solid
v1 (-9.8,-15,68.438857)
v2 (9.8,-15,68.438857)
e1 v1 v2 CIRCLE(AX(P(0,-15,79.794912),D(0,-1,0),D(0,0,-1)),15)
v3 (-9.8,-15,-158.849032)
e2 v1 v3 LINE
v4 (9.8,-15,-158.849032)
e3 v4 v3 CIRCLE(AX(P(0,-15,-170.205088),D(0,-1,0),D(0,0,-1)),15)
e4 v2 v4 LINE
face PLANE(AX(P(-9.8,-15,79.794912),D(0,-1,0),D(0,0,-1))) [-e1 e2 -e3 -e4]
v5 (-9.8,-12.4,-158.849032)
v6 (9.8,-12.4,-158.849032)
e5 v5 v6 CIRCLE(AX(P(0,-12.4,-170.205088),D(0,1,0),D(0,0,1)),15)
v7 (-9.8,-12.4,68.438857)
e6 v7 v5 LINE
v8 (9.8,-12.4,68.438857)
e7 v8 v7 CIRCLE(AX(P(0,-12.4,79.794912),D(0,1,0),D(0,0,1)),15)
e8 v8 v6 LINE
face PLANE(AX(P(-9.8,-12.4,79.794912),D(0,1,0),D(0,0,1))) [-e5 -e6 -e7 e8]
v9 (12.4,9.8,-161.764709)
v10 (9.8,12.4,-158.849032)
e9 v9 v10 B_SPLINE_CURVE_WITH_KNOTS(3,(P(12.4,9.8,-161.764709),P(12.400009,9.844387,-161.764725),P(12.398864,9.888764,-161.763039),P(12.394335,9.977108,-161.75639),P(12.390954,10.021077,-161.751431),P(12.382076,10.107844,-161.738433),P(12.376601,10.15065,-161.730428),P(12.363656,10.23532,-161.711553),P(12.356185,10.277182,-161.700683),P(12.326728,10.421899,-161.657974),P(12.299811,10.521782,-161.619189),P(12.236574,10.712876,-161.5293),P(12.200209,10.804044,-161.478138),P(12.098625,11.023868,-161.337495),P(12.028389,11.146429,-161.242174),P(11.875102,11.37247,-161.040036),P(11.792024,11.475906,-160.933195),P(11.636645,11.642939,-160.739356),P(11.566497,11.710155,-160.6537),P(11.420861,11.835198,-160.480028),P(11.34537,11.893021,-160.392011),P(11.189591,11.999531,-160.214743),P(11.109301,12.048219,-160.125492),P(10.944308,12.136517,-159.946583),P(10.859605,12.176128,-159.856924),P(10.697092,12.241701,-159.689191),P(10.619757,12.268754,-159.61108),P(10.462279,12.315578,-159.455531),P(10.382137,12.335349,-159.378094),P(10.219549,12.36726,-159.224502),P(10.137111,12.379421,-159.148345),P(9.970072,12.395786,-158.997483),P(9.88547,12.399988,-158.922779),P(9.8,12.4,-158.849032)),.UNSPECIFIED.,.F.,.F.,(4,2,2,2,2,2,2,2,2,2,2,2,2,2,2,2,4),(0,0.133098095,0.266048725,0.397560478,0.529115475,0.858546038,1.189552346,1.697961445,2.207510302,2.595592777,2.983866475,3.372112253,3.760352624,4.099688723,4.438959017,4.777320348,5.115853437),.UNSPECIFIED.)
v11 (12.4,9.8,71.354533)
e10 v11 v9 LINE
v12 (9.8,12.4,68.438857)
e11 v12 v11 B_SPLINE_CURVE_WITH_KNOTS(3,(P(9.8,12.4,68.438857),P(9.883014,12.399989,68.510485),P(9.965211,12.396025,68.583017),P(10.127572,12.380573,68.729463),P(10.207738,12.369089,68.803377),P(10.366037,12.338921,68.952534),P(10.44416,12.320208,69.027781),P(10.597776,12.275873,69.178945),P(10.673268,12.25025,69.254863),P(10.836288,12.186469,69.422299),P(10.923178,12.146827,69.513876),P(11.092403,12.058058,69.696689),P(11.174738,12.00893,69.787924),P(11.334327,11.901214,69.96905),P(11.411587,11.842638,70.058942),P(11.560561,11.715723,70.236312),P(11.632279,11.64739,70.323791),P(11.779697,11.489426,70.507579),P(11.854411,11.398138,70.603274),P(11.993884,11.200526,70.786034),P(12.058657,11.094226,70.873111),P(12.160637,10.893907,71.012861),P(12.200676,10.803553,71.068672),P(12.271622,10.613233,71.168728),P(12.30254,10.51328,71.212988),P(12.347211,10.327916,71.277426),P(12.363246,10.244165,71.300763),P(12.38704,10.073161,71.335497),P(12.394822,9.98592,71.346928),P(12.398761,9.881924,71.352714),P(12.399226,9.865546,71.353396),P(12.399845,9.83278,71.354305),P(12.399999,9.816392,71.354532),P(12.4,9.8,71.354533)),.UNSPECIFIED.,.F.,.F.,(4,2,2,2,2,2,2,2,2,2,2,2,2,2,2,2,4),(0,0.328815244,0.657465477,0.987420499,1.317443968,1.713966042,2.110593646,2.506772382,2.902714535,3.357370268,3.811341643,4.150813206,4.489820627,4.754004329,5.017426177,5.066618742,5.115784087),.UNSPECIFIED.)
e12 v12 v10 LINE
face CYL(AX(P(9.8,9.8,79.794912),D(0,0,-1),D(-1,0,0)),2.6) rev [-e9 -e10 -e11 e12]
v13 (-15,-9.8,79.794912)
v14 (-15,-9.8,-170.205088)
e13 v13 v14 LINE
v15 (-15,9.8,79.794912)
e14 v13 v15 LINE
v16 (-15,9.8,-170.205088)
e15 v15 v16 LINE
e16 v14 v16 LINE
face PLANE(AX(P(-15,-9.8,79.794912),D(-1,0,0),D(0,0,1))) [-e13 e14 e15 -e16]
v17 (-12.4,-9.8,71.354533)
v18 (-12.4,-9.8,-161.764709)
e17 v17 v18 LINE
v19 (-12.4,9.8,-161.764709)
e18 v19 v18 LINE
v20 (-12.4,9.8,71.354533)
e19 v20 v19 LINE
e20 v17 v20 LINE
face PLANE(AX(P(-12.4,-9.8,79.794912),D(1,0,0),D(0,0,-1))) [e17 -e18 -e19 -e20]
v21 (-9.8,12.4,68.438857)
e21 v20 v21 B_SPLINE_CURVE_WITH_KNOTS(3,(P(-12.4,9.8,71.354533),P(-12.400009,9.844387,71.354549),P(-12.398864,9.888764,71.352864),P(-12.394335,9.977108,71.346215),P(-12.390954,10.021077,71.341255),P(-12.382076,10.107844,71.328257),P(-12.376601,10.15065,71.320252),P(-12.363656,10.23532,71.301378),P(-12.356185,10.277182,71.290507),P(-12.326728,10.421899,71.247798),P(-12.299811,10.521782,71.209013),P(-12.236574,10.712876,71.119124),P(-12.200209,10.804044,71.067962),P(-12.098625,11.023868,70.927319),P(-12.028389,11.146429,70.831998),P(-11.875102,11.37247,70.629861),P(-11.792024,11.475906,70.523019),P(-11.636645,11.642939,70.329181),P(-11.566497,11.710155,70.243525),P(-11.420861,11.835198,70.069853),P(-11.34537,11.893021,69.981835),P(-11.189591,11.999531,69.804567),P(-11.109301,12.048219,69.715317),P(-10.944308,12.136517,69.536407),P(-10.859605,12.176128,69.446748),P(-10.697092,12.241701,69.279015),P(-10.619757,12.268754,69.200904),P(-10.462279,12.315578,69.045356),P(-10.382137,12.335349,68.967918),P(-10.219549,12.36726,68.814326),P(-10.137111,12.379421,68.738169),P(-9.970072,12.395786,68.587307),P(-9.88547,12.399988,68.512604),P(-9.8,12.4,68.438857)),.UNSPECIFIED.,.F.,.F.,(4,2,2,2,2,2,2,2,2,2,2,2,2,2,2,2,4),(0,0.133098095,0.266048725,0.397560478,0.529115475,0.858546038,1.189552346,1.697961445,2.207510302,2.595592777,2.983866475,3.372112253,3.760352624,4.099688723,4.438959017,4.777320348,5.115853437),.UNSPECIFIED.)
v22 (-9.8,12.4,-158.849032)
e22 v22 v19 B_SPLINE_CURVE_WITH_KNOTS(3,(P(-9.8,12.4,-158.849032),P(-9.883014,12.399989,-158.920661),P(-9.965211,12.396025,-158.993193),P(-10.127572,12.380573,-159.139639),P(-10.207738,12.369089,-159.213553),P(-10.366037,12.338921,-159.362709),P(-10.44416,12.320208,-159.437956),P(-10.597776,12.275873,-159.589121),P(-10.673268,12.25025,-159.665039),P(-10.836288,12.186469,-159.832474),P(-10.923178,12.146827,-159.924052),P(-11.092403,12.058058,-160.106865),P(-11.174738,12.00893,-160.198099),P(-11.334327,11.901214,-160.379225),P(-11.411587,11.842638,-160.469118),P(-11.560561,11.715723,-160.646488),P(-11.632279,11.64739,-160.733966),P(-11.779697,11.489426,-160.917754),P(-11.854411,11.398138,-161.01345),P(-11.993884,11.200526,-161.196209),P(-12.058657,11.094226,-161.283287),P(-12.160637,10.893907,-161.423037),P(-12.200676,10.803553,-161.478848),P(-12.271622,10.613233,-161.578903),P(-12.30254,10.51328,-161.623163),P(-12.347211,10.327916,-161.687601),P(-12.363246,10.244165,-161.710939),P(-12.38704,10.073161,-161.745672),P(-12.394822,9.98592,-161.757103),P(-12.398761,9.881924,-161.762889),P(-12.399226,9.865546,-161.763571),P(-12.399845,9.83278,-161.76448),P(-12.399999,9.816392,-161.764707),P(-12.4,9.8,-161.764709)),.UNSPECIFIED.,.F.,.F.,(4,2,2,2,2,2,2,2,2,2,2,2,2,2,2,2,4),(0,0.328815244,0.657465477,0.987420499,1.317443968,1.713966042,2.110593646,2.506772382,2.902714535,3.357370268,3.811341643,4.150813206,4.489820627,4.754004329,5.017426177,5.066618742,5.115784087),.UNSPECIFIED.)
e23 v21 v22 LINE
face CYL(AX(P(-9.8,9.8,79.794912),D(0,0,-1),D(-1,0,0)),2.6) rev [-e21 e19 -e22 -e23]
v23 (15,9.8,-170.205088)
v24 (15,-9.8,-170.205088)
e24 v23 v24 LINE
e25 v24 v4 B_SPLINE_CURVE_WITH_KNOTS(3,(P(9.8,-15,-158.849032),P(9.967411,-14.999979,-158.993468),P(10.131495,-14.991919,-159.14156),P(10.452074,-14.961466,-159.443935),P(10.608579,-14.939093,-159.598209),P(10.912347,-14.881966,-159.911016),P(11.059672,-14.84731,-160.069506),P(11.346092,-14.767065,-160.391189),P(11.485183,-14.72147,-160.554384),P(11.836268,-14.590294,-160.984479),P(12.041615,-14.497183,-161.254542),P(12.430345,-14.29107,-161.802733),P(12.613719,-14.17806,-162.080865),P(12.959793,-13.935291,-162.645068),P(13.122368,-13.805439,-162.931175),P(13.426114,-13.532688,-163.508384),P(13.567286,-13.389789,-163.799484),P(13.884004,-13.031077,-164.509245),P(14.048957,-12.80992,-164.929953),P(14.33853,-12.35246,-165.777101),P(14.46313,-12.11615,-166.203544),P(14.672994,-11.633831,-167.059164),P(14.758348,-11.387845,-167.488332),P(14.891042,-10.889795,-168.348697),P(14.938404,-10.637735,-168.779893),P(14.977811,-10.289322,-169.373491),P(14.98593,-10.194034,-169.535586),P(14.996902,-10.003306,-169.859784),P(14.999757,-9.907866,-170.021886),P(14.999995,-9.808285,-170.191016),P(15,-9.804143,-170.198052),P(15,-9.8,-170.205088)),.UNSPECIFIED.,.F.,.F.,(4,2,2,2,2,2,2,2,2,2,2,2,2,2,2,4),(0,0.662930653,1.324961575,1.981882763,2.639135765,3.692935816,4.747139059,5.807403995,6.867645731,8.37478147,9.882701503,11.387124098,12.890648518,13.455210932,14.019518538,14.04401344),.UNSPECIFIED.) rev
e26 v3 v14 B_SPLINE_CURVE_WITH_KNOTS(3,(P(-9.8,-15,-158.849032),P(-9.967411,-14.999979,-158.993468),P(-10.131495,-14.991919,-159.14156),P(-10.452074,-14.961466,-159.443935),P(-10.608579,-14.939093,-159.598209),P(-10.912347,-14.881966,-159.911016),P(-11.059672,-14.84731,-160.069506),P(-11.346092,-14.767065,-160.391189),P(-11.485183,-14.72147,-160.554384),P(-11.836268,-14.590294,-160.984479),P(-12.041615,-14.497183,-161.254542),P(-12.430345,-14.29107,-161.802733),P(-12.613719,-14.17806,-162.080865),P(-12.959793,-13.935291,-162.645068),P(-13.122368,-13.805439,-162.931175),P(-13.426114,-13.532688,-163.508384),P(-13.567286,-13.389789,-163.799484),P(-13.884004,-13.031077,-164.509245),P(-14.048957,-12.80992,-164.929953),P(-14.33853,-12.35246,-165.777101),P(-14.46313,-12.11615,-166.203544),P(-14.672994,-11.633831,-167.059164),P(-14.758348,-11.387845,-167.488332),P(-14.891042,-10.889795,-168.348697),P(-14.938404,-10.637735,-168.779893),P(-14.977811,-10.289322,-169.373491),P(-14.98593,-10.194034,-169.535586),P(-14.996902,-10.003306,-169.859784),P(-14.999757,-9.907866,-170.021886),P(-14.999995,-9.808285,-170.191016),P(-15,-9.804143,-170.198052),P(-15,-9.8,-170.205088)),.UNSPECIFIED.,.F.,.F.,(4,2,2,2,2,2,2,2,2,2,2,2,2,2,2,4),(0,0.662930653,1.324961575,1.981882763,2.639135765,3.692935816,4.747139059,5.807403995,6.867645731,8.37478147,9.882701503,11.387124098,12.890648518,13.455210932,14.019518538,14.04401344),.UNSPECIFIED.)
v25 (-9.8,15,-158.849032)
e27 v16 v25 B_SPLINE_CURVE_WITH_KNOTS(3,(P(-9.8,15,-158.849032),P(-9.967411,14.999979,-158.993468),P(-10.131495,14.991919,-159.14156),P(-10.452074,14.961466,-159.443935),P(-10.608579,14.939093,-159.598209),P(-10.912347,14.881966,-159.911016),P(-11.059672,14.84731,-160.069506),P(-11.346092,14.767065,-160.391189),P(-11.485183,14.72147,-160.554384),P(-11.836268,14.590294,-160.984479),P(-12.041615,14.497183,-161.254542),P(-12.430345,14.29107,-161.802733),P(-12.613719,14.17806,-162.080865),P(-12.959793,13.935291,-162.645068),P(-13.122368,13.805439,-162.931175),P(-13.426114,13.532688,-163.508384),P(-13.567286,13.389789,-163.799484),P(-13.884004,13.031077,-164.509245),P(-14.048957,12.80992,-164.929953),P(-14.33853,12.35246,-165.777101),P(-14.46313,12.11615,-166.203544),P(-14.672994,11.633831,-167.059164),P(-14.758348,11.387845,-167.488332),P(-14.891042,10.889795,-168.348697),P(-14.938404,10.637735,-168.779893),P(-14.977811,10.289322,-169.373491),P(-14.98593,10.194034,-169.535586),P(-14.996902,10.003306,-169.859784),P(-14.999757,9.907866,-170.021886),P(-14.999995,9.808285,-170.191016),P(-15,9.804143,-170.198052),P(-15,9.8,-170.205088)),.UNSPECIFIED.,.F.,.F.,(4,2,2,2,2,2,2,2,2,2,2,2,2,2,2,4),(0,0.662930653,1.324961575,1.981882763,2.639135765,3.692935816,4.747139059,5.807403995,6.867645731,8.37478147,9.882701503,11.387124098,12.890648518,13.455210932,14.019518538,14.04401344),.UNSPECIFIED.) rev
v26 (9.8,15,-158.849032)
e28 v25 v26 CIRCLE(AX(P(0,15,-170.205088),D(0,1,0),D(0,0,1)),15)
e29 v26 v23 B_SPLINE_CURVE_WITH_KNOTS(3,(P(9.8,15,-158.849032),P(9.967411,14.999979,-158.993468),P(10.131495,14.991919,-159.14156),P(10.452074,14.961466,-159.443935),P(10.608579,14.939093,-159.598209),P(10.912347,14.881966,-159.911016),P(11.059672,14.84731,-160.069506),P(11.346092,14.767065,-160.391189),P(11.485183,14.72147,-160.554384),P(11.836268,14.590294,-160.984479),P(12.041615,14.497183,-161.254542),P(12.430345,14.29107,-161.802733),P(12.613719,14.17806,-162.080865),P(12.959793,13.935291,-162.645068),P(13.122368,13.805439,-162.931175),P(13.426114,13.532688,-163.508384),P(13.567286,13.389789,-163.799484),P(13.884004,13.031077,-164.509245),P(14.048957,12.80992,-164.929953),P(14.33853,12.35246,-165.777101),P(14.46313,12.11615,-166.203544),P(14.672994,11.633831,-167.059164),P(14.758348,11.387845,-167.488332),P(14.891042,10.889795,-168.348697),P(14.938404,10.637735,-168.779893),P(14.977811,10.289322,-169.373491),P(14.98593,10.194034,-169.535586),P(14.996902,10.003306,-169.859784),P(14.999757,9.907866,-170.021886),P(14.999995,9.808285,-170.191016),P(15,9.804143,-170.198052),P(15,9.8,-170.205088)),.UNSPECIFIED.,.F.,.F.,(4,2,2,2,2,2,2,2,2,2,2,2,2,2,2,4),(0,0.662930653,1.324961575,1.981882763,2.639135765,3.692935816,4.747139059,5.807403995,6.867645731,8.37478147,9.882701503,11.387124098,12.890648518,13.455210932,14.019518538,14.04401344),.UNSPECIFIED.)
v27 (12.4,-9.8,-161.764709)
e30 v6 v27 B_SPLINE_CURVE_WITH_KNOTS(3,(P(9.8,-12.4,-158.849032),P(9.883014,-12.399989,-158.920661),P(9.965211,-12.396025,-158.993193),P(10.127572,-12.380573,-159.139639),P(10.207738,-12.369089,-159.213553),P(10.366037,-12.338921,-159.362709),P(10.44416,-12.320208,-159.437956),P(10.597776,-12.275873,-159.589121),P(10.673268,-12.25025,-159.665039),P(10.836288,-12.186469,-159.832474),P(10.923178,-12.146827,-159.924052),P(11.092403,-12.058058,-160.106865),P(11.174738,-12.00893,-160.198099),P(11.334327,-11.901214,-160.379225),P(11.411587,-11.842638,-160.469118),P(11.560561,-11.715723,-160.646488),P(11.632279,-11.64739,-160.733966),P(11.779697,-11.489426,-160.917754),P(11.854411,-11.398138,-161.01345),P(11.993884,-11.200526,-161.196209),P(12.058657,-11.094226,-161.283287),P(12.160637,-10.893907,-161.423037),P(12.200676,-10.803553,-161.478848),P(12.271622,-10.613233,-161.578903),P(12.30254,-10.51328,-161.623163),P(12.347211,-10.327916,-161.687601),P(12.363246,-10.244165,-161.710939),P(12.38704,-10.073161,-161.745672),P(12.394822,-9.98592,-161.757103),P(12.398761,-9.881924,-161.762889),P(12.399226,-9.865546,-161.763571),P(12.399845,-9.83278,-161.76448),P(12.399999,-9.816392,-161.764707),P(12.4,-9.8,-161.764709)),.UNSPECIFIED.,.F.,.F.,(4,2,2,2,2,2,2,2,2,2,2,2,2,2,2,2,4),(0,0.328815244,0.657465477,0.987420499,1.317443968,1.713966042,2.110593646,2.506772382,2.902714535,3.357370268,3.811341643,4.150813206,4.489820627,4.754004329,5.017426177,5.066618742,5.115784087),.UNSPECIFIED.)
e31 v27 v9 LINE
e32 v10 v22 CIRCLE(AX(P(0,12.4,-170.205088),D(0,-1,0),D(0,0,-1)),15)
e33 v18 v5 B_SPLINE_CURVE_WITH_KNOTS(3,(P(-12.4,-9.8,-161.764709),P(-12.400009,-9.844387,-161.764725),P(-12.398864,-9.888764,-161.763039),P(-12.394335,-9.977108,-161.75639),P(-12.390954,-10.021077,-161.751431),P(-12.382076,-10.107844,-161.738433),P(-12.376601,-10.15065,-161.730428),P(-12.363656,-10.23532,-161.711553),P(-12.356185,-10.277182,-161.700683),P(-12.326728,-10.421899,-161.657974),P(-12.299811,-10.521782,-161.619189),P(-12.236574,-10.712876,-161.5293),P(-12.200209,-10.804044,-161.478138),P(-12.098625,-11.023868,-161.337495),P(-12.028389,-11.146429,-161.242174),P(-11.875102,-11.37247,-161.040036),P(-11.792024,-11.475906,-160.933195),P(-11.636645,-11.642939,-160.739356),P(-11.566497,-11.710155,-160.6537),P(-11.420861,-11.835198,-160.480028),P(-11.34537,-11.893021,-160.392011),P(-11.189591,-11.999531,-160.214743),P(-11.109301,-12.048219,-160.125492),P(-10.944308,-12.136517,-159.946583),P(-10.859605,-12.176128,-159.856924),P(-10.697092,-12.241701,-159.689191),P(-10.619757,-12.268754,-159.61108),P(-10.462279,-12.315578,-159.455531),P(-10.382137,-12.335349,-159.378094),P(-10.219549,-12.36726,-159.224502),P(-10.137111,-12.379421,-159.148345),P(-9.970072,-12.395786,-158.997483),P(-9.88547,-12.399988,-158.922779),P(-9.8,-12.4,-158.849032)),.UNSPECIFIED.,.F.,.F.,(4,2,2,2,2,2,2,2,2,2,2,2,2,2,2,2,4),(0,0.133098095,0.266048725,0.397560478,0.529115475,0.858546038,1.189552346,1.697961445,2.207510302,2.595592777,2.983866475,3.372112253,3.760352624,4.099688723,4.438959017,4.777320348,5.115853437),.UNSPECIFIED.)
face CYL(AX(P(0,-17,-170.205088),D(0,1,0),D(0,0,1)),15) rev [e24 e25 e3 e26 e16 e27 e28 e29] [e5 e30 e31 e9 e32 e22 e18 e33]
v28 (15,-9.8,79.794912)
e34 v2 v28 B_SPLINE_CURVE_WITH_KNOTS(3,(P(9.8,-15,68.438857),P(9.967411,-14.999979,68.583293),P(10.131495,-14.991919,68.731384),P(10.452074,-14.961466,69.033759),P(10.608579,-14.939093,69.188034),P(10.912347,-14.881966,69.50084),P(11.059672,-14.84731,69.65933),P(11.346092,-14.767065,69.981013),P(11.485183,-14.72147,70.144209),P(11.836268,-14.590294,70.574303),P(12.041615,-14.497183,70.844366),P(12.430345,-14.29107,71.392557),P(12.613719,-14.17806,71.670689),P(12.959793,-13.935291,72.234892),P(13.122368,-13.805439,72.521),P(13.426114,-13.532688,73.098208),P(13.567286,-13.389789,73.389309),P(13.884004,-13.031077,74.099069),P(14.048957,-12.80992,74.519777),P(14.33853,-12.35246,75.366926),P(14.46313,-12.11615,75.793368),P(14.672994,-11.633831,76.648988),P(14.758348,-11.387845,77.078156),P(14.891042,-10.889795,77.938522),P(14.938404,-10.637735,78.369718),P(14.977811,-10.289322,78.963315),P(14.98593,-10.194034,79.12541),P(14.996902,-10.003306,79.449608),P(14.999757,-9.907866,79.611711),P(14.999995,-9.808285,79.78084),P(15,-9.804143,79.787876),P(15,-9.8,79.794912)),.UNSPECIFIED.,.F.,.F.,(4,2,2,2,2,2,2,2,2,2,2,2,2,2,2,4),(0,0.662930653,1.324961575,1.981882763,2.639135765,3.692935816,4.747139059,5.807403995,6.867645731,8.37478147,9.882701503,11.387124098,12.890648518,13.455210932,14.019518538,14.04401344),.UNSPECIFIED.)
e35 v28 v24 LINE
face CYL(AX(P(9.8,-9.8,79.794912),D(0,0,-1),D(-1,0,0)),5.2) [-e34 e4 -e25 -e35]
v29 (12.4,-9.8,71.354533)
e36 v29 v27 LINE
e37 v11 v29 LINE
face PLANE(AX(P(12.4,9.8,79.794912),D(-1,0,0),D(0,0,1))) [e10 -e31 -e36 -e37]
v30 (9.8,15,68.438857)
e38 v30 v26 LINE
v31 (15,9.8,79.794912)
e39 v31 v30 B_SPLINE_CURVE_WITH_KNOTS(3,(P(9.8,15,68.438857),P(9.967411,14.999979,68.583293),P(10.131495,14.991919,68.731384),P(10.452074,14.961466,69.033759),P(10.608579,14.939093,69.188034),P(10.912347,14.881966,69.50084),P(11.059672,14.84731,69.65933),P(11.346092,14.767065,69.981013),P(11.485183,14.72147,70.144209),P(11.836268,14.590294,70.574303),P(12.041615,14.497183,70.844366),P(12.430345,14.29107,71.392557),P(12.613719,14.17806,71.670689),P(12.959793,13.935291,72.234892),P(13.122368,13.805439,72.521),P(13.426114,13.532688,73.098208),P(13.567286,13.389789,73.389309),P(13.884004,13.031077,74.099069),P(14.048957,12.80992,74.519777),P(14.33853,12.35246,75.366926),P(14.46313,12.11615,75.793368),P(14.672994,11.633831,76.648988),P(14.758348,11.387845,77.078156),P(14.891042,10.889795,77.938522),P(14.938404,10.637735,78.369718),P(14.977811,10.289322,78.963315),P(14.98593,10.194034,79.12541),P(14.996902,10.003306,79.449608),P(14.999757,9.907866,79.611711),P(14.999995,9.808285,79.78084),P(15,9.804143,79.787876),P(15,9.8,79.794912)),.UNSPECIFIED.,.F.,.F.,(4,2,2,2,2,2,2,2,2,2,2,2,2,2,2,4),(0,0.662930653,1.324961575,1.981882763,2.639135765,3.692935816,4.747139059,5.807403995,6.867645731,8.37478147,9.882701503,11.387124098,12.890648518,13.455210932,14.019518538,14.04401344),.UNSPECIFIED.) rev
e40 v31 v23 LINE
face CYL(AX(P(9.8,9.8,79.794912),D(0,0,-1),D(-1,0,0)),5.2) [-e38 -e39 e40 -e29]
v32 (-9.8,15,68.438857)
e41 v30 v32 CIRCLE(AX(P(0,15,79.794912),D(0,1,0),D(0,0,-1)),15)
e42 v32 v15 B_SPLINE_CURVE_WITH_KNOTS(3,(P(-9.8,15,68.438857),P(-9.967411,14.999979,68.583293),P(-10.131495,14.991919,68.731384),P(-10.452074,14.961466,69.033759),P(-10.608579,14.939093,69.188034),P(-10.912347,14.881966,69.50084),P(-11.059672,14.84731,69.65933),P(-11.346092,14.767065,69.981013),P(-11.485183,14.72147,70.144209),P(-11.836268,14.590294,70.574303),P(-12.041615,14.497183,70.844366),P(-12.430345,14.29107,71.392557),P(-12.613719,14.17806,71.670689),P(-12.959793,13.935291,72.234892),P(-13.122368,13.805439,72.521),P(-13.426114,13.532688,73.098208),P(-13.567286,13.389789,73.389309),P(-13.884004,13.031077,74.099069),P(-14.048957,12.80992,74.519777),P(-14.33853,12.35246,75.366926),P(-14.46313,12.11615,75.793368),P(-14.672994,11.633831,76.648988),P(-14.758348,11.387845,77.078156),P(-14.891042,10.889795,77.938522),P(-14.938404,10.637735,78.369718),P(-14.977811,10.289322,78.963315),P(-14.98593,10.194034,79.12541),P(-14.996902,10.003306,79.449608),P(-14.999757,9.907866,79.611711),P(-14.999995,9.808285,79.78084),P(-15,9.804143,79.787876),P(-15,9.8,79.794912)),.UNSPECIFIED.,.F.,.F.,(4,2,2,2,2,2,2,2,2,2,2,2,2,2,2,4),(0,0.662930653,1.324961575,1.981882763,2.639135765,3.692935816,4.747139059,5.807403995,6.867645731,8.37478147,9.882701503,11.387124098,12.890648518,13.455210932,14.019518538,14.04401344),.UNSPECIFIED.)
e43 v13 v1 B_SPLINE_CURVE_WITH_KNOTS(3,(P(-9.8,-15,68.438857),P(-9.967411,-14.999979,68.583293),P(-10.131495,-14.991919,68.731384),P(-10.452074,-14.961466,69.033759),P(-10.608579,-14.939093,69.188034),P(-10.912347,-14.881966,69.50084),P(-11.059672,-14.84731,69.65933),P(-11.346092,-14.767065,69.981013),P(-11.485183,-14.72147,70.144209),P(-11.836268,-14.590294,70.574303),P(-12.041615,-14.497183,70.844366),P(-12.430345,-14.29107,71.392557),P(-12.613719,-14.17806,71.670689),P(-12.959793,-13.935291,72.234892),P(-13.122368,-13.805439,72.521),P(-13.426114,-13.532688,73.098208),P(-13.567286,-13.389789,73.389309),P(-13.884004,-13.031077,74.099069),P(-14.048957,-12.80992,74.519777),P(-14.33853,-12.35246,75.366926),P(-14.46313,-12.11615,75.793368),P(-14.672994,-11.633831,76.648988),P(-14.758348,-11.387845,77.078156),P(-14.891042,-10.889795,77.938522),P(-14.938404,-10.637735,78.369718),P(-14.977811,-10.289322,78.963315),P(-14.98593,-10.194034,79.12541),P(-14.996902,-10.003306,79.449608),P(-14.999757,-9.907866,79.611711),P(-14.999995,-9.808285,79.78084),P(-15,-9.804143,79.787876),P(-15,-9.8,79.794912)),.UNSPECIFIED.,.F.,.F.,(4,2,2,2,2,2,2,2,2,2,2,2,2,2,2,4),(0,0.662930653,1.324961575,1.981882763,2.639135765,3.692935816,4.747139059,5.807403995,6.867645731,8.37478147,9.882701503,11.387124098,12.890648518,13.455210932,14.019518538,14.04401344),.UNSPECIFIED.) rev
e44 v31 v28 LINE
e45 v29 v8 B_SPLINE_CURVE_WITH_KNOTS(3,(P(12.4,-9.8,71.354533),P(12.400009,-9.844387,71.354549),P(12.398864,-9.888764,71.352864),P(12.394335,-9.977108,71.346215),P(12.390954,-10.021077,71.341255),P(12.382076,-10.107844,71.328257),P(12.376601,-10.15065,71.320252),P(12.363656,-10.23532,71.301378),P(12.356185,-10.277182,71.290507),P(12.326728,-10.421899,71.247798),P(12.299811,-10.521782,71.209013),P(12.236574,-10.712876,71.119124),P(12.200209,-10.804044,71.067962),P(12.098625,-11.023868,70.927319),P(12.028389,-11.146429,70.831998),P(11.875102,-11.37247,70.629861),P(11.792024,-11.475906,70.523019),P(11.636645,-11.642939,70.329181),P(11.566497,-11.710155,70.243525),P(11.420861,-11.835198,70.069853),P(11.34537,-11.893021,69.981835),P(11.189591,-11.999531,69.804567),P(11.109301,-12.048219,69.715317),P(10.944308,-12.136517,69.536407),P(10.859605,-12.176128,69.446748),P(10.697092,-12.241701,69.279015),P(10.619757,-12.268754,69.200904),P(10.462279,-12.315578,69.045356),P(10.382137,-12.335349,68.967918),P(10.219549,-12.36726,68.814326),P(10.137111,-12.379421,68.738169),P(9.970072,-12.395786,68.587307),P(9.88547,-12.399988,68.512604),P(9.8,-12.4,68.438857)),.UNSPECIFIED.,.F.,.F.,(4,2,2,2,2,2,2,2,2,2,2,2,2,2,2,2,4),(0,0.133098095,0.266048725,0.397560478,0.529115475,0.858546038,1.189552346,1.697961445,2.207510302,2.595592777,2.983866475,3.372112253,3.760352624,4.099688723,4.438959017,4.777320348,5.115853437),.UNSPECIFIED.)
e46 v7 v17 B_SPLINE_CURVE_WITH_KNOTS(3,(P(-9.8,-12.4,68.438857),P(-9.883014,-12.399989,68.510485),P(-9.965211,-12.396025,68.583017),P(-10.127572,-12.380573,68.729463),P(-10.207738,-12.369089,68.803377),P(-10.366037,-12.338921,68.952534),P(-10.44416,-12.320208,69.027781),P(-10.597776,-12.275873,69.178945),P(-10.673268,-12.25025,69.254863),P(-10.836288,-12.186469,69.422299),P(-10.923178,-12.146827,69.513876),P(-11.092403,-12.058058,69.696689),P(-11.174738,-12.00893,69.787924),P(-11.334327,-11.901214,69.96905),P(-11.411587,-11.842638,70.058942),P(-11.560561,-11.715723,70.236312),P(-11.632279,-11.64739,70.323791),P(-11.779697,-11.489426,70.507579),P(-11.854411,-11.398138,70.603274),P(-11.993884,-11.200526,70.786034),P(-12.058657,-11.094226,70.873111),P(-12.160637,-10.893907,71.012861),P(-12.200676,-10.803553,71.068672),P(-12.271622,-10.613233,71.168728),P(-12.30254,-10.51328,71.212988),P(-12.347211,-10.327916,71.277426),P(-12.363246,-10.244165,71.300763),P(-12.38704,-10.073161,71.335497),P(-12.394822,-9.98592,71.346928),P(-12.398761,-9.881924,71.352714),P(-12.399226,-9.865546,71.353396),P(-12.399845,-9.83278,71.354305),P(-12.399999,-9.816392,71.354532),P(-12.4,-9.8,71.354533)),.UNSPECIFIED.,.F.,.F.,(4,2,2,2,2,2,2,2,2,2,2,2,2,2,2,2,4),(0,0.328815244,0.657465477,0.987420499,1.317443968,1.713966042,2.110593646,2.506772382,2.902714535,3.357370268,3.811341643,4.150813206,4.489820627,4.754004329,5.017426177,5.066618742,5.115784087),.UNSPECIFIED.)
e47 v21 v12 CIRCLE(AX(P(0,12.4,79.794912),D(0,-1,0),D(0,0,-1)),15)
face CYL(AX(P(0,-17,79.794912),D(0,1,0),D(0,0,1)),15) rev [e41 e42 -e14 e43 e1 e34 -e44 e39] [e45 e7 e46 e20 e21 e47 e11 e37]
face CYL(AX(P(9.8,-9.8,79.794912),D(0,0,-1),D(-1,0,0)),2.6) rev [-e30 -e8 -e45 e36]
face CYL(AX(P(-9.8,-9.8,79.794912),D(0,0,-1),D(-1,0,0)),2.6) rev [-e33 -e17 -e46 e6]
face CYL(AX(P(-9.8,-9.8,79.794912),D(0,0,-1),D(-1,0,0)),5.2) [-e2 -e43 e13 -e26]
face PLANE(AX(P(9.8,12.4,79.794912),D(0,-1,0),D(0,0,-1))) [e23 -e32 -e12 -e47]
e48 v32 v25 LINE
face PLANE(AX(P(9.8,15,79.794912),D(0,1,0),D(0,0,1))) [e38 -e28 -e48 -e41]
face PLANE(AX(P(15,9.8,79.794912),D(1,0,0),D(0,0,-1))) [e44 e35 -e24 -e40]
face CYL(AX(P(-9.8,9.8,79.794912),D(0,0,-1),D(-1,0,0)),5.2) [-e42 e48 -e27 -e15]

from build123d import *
from OCP.BRepAlgoAPI import BRepAlgoAPI_Cut
from OCP.TopTools import TopTools_ListOfShape

# Parameters (mm, degrees)
SISTEMA_START              = -170.205087805
SISTEMA_ESTRUCTURAL2_DEPTH = 250
CORTAR_EXTRUIR2_DEPTH      = 32


with BuildPart() as part:
    # Sistema estructural2: read off the stored shape, not the designer's step
    # Sistema estructural2 outline → Sistema estructural2 (new body)
    with BuildSketch(Plane.XY.offset(SISTEMA_START)):
        with BuildLine():
            ThreePointArc((15, 9.8), (13.476955262, 13.476955262), (9.8, 15))
            Line((9.8, 15), (-9.8, 15))
            ThreePointArc((-9.8, 15), (-13.476955262, 13.476955262), (-15, 9.8))
            Line((-15, 9.8), (-15, -9.8))
            ThreePointArc((-15, -9.8), (-13.476955262, -13.476955262), (-9.8, -15))
            Line((-9.8, -15), (9.8, -15))
            ThreePointArc((9.8, -15), (13.476955262, -13.476955262), (15, -9.8))
            Line((15, -9.8), (15, 9.8))
        make_face()
        with BuildLine():
            ThreePointArc((12.4, -9.8), (11.638477631, -11.638477631), (9.8, -12.4))
            Line((9.8, -12.4), (-9.8, -12.4))
            ThreePointArc((-9.8, -12.4), (-11.638477631, -11.638477631), (-12.4, -9.8))
            Line((-12.4, -9.8), (-12.4, 9.8))
            ThreePointArc((-12.4, 9.8), (-11.638477631, 11.638477631), (-9.8, 12.4))
            Line((-9.8, 12.4), (9.8, 12.4))
            ThreePointArc((9.8, 12.4), (11.638477631, 11.638477631), (12.4, 9.8))
            Line((12.4, 9.8), (12.4, -9.8))
        make_face(mode=Mode.SUBTRACT)
    extrude(amount=SISTEMA_ESTRUCTURAL2_DEPTH)


with BuildPart() as cortar_extruir2_tool:
    # Croquis10 → Cortar-Extruir2 (new body)
    with BuildSketch(Plane(origin=(0, 15, 0), x_dir=(1, 0, 0), z_dir=(0, 1, 0))):
        with BuildLine():
            Line((-15, -79.794912195), (15, -79.794912195))
            ThreePointArc((15, -79.794912195), (0, -64.794912195), (-15, -79.794912195))
        make_face()
        with BuildLine():
            Line((-15, 170.205087805), (15, 170.205087805))
            ThreePointArc((15, 170.205087805), (0, 155.205087805), (-15, 170.205087805))
        make_face()
    extrude(amount=-CORTAR_EXTRUIR2_DEPTH)


with BuildPart() as part_1:
    add(part.part)

    # Cortar-Extruir2: cut by cortar_extruir2_tool, with a tolerance
    cortar_extruir2_stock = TopTools_ListOfShape()
    cortar_extruir2_stock.Append(part_1.part.wrapped)
    cortar_extruir2_tools = TopTools_ListOfShape()
    cortar_extruir2_tools.Append(cortar_extruir2_tool.part.wrapped)
    cortar_extruir2_cut = BRepAlgoAPI_Cut()
    cortar_extruir2_cut.SetArguments(cortar_extruir2_stock)
    cortar_extruir2_cut.SetTools(cortar_extruir2_tools)
    cortar_extruir2_cut.SetFuzzyValue(0.00001)
    cortar_extruir2_cut.Build()
    add(Compound.cast(cortar_extruir2_cut.Shape()).solids(), mode=Mode.REPLACE)


solid = part_1.part
